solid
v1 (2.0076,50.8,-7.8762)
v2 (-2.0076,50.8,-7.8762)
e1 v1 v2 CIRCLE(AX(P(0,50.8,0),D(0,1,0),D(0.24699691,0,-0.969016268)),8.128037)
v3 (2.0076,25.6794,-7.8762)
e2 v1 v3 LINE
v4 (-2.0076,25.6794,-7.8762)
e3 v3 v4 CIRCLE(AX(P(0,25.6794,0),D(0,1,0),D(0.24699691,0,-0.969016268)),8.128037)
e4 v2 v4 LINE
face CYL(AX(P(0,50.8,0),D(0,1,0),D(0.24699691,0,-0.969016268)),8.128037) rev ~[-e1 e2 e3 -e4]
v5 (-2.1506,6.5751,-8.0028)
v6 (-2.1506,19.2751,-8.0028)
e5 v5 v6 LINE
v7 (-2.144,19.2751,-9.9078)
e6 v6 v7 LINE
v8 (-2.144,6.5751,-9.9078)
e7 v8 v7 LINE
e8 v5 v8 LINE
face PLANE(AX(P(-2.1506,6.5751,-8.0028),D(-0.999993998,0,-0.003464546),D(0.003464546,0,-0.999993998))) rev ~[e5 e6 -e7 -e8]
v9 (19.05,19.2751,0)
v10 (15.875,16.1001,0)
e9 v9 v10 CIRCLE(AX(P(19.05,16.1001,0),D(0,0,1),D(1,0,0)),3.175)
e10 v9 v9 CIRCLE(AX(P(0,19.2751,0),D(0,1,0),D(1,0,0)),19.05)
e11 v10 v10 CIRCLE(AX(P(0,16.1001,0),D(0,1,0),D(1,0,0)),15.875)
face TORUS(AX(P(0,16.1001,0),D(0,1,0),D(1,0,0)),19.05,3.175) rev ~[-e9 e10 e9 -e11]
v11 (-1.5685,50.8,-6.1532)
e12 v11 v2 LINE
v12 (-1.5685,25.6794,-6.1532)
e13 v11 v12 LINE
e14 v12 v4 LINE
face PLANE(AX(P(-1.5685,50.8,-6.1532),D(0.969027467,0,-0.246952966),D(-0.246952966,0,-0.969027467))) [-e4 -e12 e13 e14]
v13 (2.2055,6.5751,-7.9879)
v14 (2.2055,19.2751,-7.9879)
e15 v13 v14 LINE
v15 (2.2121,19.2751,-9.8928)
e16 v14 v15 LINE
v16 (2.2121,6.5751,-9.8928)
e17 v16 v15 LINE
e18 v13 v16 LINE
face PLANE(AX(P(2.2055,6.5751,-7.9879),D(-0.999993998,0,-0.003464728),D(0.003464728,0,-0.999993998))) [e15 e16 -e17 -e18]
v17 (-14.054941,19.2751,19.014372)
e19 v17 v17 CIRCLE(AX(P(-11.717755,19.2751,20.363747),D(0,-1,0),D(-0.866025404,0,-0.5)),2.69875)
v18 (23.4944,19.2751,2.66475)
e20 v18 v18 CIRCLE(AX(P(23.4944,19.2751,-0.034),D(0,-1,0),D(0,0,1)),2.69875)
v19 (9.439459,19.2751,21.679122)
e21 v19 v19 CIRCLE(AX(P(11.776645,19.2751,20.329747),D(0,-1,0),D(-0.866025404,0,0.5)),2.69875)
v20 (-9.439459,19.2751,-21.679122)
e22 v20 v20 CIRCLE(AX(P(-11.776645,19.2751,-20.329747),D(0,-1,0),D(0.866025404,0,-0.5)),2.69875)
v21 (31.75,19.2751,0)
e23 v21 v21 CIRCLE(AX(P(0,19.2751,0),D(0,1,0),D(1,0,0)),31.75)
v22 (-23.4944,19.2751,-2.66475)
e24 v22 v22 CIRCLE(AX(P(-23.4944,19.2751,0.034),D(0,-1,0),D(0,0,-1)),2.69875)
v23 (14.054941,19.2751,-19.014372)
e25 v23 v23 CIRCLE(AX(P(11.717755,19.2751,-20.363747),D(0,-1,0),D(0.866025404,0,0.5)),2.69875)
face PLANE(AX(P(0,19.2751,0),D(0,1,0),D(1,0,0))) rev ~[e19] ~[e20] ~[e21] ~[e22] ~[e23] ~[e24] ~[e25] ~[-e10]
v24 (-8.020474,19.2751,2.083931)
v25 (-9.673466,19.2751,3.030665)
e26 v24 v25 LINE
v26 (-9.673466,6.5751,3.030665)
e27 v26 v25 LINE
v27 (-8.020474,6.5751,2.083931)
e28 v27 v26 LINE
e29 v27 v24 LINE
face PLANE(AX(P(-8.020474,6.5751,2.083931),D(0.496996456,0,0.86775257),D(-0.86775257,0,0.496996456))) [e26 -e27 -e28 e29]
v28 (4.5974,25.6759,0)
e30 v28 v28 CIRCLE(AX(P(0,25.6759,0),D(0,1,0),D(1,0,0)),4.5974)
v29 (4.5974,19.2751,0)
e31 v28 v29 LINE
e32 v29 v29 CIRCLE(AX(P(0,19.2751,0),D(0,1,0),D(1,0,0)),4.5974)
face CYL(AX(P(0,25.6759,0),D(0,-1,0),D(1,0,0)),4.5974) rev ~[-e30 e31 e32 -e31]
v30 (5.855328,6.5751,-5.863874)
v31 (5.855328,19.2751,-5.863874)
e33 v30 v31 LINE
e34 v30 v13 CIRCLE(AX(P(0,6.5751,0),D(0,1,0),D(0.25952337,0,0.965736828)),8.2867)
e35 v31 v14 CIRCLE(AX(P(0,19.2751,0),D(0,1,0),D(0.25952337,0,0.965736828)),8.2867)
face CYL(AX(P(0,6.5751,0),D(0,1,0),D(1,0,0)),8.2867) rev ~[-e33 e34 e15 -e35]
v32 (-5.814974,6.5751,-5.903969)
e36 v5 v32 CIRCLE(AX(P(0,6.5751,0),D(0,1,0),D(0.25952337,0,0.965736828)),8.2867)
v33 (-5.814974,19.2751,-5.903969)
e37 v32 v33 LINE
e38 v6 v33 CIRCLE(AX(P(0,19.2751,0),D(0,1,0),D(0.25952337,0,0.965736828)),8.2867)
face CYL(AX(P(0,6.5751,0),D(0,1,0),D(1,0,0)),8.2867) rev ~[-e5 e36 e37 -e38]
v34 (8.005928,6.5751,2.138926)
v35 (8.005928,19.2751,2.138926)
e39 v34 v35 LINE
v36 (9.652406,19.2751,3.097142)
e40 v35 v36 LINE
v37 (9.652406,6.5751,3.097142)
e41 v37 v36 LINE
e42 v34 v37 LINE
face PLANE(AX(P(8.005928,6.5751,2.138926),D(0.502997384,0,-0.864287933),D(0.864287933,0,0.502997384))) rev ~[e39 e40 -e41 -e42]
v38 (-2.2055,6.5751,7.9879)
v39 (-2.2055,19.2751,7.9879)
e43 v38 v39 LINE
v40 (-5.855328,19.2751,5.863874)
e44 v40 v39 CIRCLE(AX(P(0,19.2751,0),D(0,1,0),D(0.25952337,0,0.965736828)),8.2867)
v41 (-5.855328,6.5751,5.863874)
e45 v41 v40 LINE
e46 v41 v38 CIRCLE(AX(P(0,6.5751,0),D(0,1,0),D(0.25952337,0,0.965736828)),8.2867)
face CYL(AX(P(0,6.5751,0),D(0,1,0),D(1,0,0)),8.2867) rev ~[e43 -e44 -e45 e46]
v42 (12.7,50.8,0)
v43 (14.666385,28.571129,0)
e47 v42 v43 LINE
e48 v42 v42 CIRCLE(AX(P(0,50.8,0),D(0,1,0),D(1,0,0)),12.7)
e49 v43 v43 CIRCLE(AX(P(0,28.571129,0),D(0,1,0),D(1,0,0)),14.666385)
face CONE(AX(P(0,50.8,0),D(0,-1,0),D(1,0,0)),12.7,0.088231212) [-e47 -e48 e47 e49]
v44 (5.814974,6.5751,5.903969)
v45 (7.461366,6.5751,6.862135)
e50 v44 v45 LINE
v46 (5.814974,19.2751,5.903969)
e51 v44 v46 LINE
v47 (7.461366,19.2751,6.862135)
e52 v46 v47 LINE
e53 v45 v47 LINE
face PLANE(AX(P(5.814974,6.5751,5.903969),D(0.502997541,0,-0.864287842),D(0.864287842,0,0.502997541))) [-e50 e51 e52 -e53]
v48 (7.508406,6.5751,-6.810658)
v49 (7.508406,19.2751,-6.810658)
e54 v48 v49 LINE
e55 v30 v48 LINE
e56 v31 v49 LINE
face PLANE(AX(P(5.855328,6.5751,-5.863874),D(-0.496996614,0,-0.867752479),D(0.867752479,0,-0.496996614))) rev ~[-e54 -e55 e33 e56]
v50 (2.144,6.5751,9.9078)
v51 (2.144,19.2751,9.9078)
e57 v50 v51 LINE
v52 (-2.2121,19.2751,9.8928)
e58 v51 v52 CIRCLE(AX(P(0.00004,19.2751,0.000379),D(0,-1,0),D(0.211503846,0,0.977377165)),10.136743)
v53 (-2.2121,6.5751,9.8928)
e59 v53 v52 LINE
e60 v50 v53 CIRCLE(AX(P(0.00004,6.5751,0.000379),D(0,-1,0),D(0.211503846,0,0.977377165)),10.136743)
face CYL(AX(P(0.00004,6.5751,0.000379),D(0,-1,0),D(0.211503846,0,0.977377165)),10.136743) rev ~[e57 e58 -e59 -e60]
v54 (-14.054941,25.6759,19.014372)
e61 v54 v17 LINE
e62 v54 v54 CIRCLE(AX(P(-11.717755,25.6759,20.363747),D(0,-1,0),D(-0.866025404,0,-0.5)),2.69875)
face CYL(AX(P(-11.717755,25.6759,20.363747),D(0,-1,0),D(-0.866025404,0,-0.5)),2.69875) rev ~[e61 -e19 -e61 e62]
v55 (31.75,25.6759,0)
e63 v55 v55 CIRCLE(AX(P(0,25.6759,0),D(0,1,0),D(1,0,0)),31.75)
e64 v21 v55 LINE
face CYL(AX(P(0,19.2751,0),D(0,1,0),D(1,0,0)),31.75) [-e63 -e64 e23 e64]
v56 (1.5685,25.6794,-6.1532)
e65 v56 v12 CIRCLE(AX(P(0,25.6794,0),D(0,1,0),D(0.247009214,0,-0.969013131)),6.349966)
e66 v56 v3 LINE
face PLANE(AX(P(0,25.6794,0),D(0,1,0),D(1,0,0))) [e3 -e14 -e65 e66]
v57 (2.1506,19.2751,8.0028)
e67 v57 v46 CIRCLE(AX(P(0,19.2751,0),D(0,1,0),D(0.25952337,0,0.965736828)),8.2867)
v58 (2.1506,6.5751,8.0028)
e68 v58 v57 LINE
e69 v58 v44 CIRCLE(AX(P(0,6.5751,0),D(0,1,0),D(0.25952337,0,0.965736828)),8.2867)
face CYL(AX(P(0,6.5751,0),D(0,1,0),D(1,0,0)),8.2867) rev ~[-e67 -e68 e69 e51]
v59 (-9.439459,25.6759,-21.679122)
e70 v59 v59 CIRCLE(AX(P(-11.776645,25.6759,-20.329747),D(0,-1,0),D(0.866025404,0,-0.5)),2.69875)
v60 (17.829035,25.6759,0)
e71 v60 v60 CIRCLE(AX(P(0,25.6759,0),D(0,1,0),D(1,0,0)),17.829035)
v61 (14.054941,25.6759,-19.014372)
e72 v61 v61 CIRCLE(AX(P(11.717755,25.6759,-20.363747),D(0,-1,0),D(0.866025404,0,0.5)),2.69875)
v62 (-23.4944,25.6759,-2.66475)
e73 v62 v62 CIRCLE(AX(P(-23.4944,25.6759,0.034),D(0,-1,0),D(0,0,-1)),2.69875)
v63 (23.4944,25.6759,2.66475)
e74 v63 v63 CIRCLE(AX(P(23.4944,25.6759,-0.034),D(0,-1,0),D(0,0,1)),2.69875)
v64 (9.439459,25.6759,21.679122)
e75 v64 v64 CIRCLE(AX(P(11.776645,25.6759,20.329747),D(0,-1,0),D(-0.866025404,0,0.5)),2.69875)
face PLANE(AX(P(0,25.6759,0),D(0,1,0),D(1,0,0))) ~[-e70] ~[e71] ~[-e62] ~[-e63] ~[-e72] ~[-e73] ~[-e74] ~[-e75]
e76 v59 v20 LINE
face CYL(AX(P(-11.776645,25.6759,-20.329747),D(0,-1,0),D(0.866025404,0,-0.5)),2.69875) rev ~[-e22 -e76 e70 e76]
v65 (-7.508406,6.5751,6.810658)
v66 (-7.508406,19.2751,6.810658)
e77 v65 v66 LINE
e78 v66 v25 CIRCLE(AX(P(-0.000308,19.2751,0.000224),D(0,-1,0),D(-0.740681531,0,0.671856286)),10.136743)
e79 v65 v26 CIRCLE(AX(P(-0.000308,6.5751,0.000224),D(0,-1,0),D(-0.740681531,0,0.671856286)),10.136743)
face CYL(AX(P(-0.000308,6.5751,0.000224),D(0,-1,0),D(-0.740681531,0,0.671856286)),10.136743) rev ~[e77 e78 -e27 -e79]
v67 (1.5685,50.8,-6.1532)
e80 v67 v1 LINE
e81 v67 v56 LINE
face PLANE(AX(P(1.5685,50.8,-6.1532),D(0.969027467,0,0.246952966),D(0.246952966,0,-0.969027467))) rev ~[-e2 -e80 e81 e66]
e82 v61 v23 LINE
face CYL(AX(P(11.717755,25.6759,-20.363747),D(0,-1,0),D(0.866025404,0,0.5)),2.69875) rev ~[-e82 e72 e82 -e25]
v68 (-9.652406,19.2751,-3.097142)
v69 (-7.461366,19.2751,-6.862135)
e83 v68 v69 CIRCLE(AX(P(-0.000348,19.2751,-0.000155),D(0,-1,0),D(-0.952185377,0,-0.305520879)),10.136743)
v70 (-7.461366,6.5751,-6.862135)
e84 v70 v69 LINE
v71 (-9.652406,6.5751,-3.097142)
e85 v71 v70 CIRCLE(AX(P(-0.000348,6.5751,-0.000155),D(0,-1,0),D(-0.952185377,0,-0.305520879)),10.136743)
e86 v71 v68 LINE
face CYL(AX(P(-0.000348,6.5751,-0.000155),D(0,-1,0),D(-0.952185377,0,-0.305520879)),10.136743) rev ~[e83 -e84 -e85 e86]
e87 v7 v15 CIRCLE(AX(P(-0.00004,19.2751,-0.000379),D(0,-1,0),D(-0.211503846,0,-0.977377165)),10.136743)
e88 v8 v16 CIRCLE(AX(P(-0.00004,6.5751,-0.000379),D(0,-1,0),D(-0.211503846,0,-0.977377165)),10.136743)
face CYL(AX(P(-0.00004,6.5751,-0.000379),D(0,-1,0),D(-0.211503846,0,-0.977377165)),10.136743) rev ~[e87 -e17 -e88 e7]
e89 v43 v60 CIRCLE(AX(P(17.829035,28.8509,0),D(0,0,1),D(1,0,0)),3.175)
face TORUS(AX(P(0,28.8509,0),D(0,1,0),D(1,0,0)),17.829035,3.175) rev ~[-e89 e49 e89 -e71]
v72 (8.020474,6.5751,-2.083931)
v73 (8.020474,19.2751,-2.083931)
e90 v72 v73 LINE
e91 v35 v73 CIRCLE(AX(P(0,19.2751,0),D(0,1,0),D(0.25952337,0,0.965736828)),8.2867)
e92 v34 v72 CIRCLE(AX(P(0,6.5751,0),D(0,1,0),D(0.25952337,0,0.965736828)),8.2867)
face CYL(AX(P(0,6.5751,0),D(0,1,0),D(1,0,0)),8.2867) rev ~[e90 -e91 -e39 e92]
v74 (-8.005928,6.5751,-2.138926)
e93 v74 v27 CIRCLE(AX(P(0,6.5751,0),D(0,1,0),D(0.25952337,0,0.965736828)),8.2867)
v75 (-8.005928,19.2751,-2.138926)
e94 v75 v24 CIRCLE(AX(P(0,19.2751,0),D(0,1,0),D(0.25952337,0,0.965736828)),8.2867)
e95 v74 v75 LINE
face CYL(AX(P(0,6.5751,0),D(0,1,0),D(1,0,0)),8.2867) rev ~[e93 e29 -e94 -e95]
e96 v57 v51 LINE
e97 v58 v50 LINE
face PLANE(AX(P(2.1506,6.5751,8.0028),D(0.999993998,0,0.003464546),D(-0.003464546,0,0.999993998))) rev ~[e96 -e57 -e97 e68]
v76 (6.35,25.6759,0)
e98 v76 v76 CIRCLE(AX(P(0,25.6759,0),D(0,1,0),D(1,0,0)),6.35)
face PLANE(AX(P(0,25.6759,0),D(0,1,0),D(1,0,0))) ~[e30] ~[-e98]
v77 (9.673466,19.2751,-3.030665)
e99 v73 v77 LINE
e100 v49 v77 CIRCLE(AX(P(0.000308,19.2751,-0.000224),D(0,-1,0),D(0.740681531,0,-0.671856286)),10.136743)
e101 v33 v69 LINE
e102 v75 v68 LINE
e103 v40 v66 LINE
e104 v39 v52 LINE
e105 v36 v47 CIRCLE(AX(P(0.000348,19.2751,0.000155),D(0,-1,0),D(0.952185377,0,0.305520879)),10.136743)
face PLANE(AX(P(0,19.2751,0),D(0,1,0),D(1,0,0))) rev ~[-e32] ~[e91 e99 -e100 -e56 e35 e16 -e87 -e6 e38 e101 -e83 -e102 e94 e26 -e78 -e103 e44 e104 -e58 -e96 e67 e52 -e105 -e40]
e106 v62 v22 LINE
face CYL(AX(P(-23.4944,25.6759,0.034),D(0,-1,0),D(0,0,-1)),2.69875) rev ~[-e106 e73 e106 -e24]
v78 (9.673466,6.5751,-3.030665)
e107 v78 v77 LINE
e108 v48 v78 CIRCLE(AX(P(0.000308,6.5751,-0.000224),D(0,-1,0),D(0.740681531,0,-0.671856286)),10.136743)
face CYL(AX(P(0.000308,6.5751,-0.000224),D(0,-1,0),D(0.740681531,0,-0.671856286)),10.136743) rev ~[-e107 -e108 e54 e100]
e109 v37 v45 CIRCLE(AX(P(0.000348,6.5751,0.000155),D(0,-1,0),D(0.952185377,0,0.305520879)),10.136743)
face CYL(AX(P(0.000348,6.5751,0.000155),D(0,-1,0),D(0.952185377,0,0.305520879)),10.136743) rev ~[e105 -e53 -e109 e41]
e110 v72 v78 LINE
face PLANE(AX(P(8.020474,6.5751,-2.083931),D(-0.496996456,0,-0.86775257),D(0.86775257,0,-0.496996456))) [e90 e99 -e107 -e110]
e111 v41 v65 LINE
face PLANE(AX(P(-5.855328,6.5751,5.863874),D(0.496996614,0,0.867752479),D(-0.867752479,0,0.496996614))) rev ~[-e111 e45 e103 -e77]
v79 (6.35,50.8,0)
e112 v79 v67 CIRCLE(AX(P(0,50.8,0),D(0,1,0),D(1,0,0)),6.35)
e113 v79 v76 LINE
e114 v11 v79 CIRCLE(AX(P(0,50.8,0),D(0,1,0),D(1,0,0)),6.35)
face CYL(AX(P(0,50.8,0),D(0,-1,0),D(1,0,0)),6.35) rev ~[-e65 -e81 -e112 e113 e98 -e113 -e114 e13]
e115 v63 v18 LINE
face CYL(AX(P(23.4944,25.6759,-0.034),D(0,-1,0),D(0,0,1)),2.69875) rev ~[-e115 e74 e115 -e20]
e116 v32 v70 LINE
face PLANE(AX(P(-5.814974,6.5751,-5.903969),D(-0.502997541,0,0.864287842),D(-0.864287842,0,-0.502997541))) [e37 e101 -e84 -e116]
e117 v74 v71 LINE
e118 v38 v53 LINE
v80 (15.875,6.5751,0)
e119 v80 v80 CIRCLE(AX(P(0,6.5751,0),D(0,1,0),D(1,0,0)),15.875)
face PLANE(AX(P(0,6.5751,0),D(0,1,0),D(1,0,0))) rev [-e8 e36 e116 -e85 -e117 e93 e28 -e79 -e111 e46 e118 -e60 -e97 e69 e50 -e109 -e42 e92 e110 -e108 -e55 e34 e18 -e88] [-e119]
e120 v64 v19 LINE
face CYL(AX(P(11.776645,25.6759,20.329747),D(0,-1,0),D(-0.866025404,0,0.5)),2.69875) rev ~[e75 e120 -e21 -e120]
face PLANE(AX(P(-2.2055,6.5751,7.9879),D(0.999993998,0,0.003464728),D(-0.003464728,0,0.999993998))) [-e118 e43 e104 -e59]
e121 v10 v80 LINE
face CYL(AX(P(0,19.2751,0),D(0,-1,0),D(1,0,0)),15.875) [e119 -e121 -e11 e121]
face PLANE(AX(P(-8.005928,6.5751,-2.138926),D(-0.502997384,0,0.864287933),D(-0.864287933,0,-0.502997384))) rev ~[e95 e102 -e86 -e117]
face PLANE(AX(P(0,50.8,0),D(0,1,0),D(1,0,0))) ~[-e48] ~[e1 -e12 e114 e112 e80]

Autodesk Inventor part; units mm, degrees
ref_plane "YZ Plane" through (0, 0, 0) normal (1, 0, 0) x (0, 1, 0)
ref_plane "XZ Plane" through (0, 0, 0) normal (0, 1, 0) x (-1, 0, 0)
ref_plane "XY Plane" through (0, 0, 0) normal (0, 0, 1) x (1, 0, 0)
sketch "Sketch1" plane through (0, 0, 0) normal (0, 0, 1) x (1, 0, 0)
  line L0 (0, 0) -> (0, 50.8) construction
  line L1 (0, 0) -> (50.8, 0) construction
  line L2 (0, 50.8) -> (6.35, 50.8) construction
  line L3 (6.35, 50.8) -> (6.35, 0) construction
  line L4 (6.35, 50.8) -> (12.7, 50.8)
  line L5 (0, 25.6759) -> (14.9225, 25.6759) construction
  line L6 (12.7, 50.8) -> (14.9225, 25.6759)
  line L7 (0, 19.2751) -> (31.75, 19.2751) construction
  line L8 (31.75, 19.2751) -> (31.75, 25.6759)
  line L9 (14.9225, 25.6759) -> (31.75, 25.6759)
  line L10 (0, 9.5479) -> (15.8115, 9.5479) construction
  line L11 (31.75, 19.2751) -> (15.875, 19.2751)
  line L12 (15.875, 19.2751) -> (15.875, 6.5751)
  line L13 (15.875, 19.2751) -> (28.575, 19.2751) construction
  line L14 (0, 22.4755) -> (31.75, 22.4755) construction
  line L15 (6.35, 50.8) -> (6.35, 25.6759)
  line L16 (0, 6.5751) -> (8.2867, 6.5751) construction
  line L17 (8.2867, 6.5751) -> (15.875, 6.5751)
  line L18 (8.2867, 6.5751) -> (8.2867, 19.2751)
  line L19 (23.5585, 11.9908) -> (23.5585, 41.3472) construction
  line L20 (4.5974, 71.0633) -> (4.5974, -11.3243) construction
  line L21 (8.2867, 19.2751) -> (4.5974, 19.2751)
  line L22 (4.5974, 25.6759) -> (6.35, 25.6759)
  line L23 (4.5974, 25.6759) -> (4.5974, 19.2751)
  dimension "d2" = 50.8
  dimension "d3" = 90
  dimension "d4" = 6.35
  dimension "d5" = 6.35
  dimension "d6" = 14.9225
  dimension "d8" = 25.2222
  dimension "d9" = 31.75
  dimension "d11" = 6.4008
  dimension "d12" = 15.8115
  dimension "d13" = 12.7
  dimension "d14" = 90
  dimension "d15" = 8.2867
  dimension "d28" = 8.1915
  dimension "d55" = 4.5974
  dimension "d56" = 12.7
  dimension "d57" = 25.1241
revolve "Revolution1" add sketch "Sketch1" angle 360 about axis through (0, 0, 0) along (0, 1, 0)
fillet "Fillet1" radius 3.175 1 edges at (-14.9225, 25.6759, 0)
fillet "Fillet2" radius 3.175 1 edges at (-15.875, 19.2751, 0)
hole "Hole2" at (23.4944, 25.6759, -0.034) direction (0, -1, 0) diameter 5.3975 end through all
pattern_circular "Circular Pattern1" count 6 over 360 about axis through (0, 38.238, 0) along (0, -1, 0) of "Hole2"
sketch "Sketch2" plane through (0, 6.5751, 0) normal (0, -1, 0) x (1, 0, 0)
  circle A0 centre (0, 0) radius 8.2867 construction
  line L0 (-2.2055, 7.9879) -> (-2.2121, 9.8928)
  circle A1 centre (0, 0) radius 10.1371 construction
  line L1 (2.1506, 8.0028) -> (2.144, 9.9078)
  line L2 (-2.2055, 7.9879) -> (2.1506, 8.0028) construction
  arc A2 (2.144, 9.9078) -> (-2.2121, 9.8928) centre (0, 0) ccw
  arc A3 (2.1506, 8.0028) -> (-2.2055, 7.9879) centre (0, 0) ccw
  dimension "d43" = 1.905
  dimension "d44" = 4.3561
extrude "Extrusion1" cut sketch "Sketch2" against normal blind 12.7
pattern_circular "Circular Pattern2" count 6 over 360 about axis through (0, 12.9251, 0) along (0, -1, 0) of "Extrusion1"
sketch "Sketch3" plane through (0, 50.8, 0) normal (0, 1, 0) x (1, 0, 0)
  circle A0 centre (0, 0) radius 6.35 construction
  line L0 (0, 6.35) -> (0, 8.128) construction
  circle A1 centre (0, 0) radius 8.128 construction
  line L1 (-1.5685, 6.1532) -> (-2.0076, 7.8762)
  line L2 (1.5685, 6.1532) -> (2.0076, 7.8762)
  line L3 (-1.5685, 6.1532) -> (1.5685, 6.1532) construction
  arc A2 (2.0076, 7.8762) -> (-2.0076, 7.8762) centre (0, 0) ccw
  arc A3 (1.5685, 6.1532) -> (-1.5685, 6.1532) centre (0, 0) ccw
  dimension "d51" = 1.778
  dimension "d52" = 3.1369
extrude "Extrusion2" cut sketch "Sketch3" against normal blind 25.1206
properties part number "denso-6 coupler"
